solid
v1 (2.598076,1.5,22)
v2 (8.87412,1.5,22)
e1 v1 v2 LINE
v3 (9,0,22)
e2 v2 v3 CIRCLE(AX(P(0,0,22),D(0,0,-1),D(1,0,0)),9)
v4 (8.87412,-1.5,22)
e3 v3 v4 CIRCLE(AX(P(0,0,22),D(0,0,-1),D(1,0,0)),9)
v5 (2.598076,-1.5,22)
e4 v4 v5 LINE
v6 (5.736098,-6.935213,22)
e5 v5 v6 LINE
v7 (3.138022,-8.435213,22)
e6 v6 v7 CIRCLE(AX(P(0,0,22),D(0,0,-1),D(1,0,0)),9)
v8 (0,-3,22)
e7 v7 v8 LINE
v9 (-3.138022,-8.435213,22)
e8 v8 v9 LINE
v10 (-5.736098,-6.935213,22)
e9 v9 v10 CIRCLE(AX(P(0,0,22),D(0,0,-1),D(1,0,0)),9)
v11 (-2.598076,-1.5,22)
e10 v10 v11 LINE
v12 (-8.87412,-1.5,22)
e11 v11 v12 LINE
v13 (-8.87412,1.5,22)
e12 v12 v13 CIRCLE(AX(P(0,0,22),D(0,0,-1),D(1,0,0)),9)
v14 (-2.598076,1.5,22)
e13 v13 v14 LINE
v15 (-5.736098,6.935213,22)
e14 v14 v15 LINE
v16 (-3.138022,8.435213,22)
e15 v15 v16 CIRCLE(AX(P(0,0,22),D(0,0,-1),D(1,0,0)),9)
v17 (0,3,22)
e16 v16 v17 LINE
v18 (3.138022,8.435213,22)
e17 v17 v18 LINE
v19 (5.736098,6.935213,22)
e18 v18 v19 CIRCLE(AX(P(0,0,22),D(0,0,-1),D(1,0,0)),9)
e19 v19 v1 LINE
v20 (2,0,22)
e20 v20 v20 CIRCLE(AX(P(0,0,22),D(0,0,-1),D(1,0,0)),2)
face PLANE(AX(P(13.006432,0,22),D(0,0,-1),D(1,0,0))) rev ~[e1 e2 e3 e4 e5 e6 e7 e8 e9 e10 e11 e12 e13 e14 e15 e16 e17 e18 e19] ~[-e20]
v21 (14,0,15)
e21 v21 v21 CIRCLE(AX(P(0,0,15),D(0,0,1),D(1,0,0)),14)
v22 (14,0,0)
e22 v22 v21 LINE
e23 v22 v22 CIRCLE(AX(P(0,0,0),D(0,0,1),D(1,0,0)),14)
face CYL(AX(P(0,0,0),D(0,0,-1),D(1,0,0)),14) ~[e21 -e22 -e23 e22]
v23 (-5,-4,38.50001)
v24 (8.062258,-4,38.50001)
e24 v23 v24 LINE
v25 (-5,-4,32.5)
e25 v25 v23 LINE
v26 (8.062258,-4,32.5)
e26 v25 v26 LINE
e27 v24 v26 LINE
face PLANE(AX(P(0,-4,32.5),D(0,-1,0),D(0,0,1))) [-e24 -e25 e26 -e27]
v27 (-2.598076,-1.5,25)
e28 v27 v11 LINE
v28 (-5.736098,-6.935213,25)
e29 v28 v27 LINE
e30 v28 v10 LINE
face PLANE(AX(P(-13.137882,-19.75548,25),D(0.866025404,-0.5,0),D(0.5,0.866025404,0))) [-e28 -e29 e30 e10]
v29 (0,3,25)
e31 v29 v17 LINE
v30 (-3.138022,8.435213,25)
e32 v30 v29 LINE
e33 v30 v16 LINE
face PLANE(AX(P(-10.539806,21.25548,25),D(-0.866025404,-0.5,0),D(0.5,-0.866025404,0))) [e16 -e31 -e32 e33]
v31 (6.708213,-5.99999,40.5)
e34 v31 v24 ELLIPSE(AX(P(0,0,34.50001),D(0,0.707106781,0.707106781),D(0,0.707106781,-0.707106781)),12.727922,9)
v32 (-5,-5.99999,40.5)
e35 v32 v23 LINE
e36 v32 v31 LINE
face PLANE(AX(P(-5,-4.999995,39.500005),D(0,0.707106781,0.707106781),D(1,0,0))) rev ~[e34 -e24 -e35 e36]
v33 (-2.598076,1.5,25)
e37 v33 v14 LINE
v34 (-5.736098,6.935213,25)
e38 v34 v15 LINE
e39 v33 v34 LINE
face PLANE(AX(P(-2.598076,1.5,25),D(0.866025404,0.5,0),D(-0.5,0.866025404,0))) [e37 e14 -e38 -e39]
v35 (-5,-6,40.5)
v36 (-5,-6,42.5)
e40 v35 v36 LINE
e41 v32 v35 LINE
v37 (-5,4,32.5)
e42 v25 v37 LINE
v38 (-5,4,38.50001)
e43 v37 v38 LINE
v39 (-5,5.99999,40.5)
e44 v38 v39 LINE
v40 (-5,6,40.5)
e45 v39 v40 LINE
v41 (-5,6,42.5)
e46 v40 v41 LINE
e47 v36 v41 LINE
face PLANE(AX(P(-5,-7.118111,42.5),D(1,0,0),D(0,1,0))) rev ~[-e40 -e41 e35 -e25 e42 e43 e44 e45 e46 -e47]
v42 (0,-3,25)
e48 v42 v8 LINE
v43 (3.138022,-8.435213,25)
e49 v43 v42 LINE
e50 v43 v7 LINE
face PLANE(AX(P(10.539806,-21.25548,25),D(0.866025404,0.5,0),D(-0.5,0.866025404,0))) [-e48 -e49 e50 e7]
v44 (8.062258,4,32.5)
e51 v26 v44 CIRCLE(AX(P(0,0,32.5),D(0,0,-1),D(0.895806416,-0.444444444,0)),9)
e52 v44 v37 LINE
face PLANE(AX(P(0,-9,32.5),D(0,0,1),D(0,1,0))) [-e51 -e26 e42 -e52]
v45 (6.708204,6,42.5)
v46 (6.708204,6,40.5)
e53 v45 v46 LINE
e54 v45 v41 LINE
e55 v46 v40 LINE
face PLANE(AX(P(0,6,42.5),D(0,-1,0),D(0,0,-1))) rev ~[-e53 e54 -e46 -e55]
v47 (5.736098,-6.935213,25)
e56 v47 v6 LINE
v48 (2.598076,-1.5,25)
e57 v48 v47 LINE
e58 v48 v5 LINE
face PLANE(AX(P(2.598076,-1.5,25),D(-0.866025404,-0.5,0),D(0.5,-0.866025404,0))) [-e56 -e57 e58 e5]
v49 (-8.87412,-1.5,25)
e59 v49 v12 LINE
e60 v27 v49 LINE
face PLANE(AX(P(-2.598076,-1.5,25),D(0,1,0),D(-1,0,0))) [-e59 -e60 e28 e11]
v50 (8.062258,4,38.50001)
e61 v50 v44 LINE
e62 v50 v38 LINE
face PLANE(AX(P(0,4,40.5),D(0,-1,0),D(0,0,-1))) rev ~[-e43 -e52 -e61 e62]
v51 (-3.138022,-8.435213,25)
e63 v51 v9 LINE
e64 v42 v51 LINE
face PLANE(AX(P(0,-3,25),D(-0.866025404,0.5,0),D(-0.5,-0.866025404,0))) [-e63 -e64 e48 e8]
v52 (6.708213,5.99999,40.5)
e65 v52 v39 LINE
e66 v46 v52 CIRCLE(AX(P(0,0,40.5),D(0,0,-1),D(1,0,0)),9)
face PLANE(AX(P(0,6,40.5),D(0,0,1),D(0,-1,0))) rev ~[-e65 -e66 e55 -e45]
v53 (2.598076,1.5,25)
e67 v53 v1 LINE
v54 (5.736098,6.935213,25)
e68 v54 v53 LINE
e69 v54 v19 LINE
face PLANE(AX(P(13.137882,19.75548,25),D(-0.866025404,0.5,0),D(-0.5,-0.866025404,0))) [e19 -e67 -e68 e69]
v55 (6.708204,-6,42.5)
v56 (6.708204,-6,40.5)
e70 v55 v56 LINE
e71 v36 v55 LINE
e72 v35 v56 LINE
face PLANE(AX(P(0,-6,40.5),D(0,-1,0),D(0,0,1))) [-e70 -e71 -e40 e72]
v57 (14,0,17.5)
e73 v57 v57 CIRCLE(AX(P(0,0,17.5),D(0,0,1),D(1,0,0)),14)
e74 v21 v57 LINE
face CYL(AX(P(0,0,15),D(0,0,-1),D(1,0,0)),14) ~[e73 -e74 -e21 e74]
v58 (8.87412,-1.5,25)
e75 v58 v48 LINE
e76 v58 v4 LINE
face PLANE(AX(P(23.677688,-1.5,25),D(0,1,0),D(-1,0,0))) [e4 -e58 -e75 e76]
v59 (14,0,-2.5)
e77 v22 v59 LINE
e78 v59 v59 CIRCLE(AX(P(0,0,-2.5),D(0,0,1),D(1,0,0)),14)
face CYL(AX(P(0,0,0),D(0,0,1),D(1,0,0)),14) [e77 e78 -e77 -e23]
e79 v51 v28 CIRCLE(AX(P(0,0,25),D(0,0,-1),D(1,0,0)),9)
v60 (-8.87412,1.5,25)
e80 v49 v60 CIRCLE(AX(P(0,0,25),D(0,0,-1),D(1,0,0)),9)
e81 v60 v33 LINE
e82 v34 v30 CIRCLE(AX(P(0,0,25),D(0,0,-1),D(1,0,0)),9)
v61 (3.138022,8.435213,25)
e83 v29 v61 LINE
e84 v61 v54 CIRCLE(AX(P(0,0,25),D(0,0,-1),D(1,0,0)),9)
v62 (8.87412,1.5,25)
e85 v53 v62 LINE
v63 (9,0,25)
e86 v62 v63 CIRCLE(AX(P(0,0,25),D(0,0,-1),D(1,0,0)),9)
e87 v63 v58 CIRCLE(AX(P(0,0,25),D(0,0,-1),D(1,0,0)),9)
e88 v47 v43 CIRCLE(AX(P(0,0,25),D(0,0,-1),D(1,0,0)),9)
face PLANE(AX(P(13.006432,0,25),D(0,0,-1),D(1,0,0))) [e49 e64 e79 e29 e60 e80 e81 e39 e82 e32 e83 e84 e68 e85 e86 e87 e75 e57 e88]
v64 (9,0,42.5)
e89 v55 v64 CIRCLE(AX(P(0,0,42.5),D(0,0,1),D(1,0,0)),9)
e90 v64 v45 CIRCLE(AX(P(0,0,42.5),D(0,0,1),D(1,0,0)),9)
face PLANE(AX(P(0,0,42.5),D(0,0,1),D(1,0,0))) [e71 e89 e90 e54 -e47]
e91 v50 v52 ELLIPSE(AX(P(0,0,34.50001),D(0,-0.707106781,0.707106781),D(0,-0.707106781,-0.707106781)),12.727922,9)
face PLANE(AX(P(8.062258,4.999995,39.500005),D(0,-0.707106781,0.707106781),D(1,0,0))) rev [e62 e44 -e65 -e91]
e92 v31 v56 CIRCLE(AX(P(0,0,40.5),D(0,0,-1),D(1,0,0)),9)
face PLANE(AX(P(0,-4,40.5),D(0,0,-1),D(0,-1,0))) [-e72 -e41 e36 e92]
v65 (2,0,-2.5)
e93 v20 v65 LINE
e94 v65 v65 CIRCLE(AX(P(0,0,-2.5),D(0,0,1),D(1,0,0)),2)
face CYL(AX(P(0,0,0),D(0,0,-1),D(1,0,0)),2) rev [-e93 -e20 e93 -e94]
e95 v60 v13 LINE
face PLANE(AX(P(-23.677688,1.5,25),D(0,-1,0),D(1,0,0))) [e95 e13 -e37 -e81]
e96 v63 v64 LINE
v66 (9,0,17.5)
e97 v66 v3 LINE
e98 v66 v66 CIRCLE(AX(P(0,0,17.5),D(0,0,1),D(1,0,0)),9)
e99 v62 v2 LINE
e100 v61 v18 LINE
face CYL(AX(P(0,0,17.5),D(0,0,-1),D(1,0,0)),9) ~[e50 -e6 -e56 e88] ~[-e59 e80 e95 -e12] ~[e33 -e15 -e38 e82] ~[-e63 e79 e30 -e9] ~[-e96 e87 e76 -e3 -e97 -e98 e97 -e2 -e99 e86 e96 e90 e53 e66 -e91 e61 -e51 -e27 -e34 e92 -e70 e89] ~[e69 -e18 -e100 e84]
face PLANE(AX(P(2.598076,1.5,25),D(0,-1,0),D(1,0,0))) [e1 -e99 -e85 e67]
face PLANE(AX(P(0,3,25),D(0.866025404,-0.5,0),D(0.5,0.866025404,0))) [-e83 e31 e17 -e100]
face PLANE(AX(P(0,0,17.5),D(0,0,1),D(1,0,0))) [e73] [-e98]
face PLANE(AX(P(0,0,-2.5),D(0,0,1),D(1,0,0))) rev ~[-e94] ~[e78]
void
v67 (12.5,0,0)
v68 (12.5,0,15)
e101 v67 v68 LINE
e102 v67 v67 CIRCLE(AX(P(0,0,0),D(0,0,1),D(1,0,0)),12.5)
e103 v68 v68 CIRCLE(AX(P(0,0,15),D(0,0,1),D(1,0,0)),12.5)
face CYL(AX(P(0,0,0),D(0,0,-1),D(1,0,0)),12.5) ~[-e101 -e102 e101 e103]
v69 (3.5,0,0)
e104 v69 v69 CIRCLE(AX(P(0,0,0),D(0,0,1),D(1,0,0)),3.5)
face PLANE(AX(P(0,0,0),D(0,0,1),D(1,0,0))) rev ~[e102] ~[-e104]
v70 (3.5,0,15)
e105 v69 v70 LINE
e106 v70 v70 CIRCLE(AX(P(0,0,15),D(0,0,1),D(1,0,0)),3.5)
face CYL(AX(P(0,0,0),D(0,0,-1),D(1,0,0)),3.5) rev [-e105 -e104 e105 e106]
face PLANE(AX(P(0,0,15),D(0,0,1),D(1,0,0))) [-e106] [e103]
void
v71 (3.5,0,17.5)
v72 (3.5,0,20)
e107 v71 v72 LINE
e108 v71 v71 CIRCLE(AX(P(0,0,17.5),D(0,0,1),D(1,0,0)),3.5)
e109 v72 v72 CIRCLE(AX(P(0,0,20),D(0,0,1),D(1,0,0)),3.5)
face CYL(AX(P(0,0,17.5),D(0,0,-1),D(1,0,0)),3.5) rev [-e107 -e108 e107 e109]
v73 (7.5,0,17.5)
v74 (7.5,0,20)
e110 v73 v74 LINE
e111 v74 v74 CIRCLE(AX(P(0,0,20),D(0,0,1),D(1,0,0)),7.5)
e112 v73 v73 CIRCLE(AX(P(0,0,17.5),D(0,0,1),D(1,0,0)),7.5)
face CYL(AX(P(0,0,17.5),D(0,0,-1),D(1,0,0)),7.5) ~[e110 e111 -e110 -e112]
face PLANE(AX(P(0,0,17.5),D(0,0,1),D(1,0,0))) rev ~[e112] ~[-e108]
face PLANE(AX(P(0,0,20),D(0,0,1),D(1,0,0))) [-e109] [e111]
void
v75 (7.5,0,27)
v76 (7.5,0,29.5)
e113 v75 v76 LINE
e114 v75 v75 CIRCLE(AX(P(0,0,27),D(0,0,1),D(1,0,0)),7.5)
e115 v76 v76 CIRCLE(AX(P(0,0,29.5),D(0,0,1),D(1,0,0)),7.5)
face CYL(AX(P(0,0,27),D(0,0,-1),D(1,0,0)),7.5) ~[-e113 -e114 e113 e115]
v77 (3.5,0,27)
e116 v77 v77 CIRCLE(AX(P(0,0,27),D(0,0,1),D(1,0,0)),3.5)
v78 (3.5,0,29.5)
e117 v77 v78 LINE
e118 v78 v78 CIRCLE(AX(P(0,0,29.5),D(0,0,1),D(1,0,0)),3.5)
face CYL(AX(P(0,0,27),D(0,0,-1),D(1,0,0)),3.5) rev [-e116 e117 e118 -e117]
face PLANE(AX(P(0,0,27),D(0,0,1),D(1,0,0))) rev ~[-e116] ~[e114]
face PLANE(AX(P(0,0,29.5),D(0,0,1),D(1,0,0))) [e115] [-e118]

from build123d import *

# Parameters (mm, degrees)
F0_R          = 14
F0_R_2        = 12.5
F0_R_3        = 3.5
F0_R_4        = 2
F1_DEPTH      = 2.5
F2_DEPTH      = 15
F3_R          = 14
F3_R_2        = 2
F4_DEPTH      = 2.5
F5_R          = 9
F5_R_2        = 7.5
F5_R_3        = 3.5
F5_R_4        = 2
F6_DEPTH      = 25
F8_DEPTH      = 25
F8_DEPTH_BACK = 25
F9_W          = 8
F9_H          = 14.2362220213
F10_DEPTH     = 10
F11_DEPTH     = 25
F13_DEPTH     = 3
F14_DEPTH     = 2.5
F15_START     = 9.5
F15_DEPTH     = 2.5
F16_SIZE2     = 1.99999
F16_SIZE      = 1.99999


# Not quite as in the source:
# - a fillet or chamfer is up to 0.001 mm smaller than in the source, because OpenCascade refuses the exact size


with BuildPart() as f1:
    # F0 (on Top) → F1 (new body)
    with BuildSketch(Plane.XY):
        Circle(F0_R)
        Circle(F0_R_2, mode=Mode.SUBTRACT)
        Circle(F0_R_2)
        Circle(F0_R_3, mode=Mode.SUBTRACT)
        Circle(F0_R_3)
        Circle(F0_R_4, mode=Mode.SUBTRACT)
    extrude(amount=-F1_DEPTH)

    # F0 (on Top) → F2 (join)
    with BuildSketch(Plane.XY):
        Circle(F0_R)
        Circle(F0_R_2, mode=Mode.SUBTRACT)
        Circle(F0_R_3)
        Circle(F0_R_4, mode=Mode.SUBTRACT)
    extrude(amount=F2_DEPTH)

    # F3 (on face) → F4 (join)
    with BuildSketch(Plane.XY.offset(15)):
        Circle(F3_R)
        Circle(F3_R_2, mode=Mode.SUBTRACT)
    extrude(amount=F4_DEPTH)

    # F5 (on face) → F6 (join)
    with BuildSketch(Plane.XY.offset(17.5)):
        Circle(F5_R)
        Circle(F5_R_2, mode=Mode.SUBTRACT)
        Circle(F5_R_2)
        Circle(F5_R_3, mode=Mode.SUBTRACT)
        Circle(F5_R_3)
        Circle(F5_R_4, mode=Mode.SUBTRACT)
        Circle(F5_R_4)
    extrude(amount=F6_DEPTH)

    # F7 (on Right) → F8 (cut, two sides)
    with BuildSketch(Plane.YZ) as f8_sk:
        Polygon((-6, 40.5), (-6, 42.5), (-9, 42.5), (-9, 32.5), (-4, 32.5), (-4, 40.5), align=None)
        Polygon((9, 42.5), (6, 42.5), (6, 40.5), (4, 40.5), (4, 32.5), (9, 32.5), align=None)
    extrude(amount=F8_DEPTH, mode=Mode.SUBTRACT)
    extrude(f8_sk.sketch, amount=-F8_DEPTH_BACK, mode=Mode.SUBTRACT)

    # F9 (on face) → F10 (cut)
    with BuildSketch(Plane.XY.offset(42.5)):
        with Locations((-9, 0)):
            Rectangle(F9_W, F9_H)
    extrude(amount=-F10_DEPTH, mode=Mode.SUBTRACT)

    # F0 (on Top) → F11 (cut)
    with BuildSketch(Plane.XY):
        Circle(F0_R_4)
    extrude(amount=F11_DEPTH, mode=Mode.SUBTRACT)

    # F12 (on face) → F13 (cut)
    with BuildSketch(Plane(origin=(0, 0, 25), x_dir=(1, 0, 0), z_dir=(0, 0, -1))):
        Polygon((2.5980762114, -1.5), (23.6776883676, -1.5), (23.6776883676, 1.5), (2.5980762114, 1.5), (1.7320508076, 0), align=None)
        Polygon((13.1378822895, -19.7554796292), (2.5980762114, -1.5), (0.8660254038, -1.5), (0, -3), (10.5398060781, -21.2554796292), align=None)
        Polygon((0.8660254038, -1.5), (2.5980762114, -1.5), (1.7320508076, 0), align=None)
        Polygon((0, -3), (0.8660254038, -1.5), (-0.8660254038, -1.5), align=None)
        Polygon((0.8660254038, 1.5), (1.7320508076, 0), (2.5980762114, 1.5), align=None)
        Polygon((0.8660254038, 1.5), (2.5980762114, 1.5), (13.1378822895, 19.7554796292), (10.5398060781, 21.2554796292), (0, 3), align=None)
        Polygon((0, -3), (-0.8660254038, -1.5), (-2.5980762114, -1.5), (-13.1378822895, -19.7554796292), (-10.5398060781, -21.2554796292), align=None)
        Polygon((-2.5980762114, -1.5), (-0.8660254038, -1.5), (-1.7320508076, 0), align=None)
        Polygon((-0.8660254038, 1.5), (0.8660254038, 1.5), (0, 3), align=None)
        Polygon((-23.6776883676, -1.5), (-2.5980762114, -1.5), (-1.7320508076, 0), (-2.5980762114, 1.5), (-23.6776883676, 1.5), align=None)
        Polygon((-2.5980762114, 1.5), (-1.7320508076, 0), (-0.8660254038, 1.5), align=None)
        Polygon((-2.5980762114, 1.5), (-0.8660254038, 1.5), (0, 3), (-10.5398060781, 21.2554796292), (-13.1378822895, 19.7554796292), align=None)
    extrude(amount=F13_DEPTH, mode=Mode.SUBTRACT)

    # F5 (on face) → F14 (cut)
    with BuildSketch(Plane.XY.offset(17.5)):
        Circle(F5_R_2)
        Circle(F5_R_3, mode=Mode.SUBTRACT)
    extrude(amount=F14_DEPTH, mode=Mode.SUBTRACT)

    # F5 (on face) → F15 (cut)
    with BuildSketch(Plane.XY.offset(17.5).offset(F15_START)):
        Circle(F5_R_2)
        Circle(F5_R_3, mode=Mode.SUBTRACT)
    extrude(amount=F15_DEPTH, mode=Mode.SUBTRACT)

    # F16 (size 2 and 2 in the source; OpenCascade refuses exactly that, so slightly less here)
    f16_edges = [f1.edges().sort_by_distance(p)[0] for p in [
        (1.531129, -4, 40.5),
        (1.531129, 4, 40.5),
    ]]
    chamfer(f16_edges, length=F16_SIZE, length2=F16_SIZE2)


solid = f1.part
